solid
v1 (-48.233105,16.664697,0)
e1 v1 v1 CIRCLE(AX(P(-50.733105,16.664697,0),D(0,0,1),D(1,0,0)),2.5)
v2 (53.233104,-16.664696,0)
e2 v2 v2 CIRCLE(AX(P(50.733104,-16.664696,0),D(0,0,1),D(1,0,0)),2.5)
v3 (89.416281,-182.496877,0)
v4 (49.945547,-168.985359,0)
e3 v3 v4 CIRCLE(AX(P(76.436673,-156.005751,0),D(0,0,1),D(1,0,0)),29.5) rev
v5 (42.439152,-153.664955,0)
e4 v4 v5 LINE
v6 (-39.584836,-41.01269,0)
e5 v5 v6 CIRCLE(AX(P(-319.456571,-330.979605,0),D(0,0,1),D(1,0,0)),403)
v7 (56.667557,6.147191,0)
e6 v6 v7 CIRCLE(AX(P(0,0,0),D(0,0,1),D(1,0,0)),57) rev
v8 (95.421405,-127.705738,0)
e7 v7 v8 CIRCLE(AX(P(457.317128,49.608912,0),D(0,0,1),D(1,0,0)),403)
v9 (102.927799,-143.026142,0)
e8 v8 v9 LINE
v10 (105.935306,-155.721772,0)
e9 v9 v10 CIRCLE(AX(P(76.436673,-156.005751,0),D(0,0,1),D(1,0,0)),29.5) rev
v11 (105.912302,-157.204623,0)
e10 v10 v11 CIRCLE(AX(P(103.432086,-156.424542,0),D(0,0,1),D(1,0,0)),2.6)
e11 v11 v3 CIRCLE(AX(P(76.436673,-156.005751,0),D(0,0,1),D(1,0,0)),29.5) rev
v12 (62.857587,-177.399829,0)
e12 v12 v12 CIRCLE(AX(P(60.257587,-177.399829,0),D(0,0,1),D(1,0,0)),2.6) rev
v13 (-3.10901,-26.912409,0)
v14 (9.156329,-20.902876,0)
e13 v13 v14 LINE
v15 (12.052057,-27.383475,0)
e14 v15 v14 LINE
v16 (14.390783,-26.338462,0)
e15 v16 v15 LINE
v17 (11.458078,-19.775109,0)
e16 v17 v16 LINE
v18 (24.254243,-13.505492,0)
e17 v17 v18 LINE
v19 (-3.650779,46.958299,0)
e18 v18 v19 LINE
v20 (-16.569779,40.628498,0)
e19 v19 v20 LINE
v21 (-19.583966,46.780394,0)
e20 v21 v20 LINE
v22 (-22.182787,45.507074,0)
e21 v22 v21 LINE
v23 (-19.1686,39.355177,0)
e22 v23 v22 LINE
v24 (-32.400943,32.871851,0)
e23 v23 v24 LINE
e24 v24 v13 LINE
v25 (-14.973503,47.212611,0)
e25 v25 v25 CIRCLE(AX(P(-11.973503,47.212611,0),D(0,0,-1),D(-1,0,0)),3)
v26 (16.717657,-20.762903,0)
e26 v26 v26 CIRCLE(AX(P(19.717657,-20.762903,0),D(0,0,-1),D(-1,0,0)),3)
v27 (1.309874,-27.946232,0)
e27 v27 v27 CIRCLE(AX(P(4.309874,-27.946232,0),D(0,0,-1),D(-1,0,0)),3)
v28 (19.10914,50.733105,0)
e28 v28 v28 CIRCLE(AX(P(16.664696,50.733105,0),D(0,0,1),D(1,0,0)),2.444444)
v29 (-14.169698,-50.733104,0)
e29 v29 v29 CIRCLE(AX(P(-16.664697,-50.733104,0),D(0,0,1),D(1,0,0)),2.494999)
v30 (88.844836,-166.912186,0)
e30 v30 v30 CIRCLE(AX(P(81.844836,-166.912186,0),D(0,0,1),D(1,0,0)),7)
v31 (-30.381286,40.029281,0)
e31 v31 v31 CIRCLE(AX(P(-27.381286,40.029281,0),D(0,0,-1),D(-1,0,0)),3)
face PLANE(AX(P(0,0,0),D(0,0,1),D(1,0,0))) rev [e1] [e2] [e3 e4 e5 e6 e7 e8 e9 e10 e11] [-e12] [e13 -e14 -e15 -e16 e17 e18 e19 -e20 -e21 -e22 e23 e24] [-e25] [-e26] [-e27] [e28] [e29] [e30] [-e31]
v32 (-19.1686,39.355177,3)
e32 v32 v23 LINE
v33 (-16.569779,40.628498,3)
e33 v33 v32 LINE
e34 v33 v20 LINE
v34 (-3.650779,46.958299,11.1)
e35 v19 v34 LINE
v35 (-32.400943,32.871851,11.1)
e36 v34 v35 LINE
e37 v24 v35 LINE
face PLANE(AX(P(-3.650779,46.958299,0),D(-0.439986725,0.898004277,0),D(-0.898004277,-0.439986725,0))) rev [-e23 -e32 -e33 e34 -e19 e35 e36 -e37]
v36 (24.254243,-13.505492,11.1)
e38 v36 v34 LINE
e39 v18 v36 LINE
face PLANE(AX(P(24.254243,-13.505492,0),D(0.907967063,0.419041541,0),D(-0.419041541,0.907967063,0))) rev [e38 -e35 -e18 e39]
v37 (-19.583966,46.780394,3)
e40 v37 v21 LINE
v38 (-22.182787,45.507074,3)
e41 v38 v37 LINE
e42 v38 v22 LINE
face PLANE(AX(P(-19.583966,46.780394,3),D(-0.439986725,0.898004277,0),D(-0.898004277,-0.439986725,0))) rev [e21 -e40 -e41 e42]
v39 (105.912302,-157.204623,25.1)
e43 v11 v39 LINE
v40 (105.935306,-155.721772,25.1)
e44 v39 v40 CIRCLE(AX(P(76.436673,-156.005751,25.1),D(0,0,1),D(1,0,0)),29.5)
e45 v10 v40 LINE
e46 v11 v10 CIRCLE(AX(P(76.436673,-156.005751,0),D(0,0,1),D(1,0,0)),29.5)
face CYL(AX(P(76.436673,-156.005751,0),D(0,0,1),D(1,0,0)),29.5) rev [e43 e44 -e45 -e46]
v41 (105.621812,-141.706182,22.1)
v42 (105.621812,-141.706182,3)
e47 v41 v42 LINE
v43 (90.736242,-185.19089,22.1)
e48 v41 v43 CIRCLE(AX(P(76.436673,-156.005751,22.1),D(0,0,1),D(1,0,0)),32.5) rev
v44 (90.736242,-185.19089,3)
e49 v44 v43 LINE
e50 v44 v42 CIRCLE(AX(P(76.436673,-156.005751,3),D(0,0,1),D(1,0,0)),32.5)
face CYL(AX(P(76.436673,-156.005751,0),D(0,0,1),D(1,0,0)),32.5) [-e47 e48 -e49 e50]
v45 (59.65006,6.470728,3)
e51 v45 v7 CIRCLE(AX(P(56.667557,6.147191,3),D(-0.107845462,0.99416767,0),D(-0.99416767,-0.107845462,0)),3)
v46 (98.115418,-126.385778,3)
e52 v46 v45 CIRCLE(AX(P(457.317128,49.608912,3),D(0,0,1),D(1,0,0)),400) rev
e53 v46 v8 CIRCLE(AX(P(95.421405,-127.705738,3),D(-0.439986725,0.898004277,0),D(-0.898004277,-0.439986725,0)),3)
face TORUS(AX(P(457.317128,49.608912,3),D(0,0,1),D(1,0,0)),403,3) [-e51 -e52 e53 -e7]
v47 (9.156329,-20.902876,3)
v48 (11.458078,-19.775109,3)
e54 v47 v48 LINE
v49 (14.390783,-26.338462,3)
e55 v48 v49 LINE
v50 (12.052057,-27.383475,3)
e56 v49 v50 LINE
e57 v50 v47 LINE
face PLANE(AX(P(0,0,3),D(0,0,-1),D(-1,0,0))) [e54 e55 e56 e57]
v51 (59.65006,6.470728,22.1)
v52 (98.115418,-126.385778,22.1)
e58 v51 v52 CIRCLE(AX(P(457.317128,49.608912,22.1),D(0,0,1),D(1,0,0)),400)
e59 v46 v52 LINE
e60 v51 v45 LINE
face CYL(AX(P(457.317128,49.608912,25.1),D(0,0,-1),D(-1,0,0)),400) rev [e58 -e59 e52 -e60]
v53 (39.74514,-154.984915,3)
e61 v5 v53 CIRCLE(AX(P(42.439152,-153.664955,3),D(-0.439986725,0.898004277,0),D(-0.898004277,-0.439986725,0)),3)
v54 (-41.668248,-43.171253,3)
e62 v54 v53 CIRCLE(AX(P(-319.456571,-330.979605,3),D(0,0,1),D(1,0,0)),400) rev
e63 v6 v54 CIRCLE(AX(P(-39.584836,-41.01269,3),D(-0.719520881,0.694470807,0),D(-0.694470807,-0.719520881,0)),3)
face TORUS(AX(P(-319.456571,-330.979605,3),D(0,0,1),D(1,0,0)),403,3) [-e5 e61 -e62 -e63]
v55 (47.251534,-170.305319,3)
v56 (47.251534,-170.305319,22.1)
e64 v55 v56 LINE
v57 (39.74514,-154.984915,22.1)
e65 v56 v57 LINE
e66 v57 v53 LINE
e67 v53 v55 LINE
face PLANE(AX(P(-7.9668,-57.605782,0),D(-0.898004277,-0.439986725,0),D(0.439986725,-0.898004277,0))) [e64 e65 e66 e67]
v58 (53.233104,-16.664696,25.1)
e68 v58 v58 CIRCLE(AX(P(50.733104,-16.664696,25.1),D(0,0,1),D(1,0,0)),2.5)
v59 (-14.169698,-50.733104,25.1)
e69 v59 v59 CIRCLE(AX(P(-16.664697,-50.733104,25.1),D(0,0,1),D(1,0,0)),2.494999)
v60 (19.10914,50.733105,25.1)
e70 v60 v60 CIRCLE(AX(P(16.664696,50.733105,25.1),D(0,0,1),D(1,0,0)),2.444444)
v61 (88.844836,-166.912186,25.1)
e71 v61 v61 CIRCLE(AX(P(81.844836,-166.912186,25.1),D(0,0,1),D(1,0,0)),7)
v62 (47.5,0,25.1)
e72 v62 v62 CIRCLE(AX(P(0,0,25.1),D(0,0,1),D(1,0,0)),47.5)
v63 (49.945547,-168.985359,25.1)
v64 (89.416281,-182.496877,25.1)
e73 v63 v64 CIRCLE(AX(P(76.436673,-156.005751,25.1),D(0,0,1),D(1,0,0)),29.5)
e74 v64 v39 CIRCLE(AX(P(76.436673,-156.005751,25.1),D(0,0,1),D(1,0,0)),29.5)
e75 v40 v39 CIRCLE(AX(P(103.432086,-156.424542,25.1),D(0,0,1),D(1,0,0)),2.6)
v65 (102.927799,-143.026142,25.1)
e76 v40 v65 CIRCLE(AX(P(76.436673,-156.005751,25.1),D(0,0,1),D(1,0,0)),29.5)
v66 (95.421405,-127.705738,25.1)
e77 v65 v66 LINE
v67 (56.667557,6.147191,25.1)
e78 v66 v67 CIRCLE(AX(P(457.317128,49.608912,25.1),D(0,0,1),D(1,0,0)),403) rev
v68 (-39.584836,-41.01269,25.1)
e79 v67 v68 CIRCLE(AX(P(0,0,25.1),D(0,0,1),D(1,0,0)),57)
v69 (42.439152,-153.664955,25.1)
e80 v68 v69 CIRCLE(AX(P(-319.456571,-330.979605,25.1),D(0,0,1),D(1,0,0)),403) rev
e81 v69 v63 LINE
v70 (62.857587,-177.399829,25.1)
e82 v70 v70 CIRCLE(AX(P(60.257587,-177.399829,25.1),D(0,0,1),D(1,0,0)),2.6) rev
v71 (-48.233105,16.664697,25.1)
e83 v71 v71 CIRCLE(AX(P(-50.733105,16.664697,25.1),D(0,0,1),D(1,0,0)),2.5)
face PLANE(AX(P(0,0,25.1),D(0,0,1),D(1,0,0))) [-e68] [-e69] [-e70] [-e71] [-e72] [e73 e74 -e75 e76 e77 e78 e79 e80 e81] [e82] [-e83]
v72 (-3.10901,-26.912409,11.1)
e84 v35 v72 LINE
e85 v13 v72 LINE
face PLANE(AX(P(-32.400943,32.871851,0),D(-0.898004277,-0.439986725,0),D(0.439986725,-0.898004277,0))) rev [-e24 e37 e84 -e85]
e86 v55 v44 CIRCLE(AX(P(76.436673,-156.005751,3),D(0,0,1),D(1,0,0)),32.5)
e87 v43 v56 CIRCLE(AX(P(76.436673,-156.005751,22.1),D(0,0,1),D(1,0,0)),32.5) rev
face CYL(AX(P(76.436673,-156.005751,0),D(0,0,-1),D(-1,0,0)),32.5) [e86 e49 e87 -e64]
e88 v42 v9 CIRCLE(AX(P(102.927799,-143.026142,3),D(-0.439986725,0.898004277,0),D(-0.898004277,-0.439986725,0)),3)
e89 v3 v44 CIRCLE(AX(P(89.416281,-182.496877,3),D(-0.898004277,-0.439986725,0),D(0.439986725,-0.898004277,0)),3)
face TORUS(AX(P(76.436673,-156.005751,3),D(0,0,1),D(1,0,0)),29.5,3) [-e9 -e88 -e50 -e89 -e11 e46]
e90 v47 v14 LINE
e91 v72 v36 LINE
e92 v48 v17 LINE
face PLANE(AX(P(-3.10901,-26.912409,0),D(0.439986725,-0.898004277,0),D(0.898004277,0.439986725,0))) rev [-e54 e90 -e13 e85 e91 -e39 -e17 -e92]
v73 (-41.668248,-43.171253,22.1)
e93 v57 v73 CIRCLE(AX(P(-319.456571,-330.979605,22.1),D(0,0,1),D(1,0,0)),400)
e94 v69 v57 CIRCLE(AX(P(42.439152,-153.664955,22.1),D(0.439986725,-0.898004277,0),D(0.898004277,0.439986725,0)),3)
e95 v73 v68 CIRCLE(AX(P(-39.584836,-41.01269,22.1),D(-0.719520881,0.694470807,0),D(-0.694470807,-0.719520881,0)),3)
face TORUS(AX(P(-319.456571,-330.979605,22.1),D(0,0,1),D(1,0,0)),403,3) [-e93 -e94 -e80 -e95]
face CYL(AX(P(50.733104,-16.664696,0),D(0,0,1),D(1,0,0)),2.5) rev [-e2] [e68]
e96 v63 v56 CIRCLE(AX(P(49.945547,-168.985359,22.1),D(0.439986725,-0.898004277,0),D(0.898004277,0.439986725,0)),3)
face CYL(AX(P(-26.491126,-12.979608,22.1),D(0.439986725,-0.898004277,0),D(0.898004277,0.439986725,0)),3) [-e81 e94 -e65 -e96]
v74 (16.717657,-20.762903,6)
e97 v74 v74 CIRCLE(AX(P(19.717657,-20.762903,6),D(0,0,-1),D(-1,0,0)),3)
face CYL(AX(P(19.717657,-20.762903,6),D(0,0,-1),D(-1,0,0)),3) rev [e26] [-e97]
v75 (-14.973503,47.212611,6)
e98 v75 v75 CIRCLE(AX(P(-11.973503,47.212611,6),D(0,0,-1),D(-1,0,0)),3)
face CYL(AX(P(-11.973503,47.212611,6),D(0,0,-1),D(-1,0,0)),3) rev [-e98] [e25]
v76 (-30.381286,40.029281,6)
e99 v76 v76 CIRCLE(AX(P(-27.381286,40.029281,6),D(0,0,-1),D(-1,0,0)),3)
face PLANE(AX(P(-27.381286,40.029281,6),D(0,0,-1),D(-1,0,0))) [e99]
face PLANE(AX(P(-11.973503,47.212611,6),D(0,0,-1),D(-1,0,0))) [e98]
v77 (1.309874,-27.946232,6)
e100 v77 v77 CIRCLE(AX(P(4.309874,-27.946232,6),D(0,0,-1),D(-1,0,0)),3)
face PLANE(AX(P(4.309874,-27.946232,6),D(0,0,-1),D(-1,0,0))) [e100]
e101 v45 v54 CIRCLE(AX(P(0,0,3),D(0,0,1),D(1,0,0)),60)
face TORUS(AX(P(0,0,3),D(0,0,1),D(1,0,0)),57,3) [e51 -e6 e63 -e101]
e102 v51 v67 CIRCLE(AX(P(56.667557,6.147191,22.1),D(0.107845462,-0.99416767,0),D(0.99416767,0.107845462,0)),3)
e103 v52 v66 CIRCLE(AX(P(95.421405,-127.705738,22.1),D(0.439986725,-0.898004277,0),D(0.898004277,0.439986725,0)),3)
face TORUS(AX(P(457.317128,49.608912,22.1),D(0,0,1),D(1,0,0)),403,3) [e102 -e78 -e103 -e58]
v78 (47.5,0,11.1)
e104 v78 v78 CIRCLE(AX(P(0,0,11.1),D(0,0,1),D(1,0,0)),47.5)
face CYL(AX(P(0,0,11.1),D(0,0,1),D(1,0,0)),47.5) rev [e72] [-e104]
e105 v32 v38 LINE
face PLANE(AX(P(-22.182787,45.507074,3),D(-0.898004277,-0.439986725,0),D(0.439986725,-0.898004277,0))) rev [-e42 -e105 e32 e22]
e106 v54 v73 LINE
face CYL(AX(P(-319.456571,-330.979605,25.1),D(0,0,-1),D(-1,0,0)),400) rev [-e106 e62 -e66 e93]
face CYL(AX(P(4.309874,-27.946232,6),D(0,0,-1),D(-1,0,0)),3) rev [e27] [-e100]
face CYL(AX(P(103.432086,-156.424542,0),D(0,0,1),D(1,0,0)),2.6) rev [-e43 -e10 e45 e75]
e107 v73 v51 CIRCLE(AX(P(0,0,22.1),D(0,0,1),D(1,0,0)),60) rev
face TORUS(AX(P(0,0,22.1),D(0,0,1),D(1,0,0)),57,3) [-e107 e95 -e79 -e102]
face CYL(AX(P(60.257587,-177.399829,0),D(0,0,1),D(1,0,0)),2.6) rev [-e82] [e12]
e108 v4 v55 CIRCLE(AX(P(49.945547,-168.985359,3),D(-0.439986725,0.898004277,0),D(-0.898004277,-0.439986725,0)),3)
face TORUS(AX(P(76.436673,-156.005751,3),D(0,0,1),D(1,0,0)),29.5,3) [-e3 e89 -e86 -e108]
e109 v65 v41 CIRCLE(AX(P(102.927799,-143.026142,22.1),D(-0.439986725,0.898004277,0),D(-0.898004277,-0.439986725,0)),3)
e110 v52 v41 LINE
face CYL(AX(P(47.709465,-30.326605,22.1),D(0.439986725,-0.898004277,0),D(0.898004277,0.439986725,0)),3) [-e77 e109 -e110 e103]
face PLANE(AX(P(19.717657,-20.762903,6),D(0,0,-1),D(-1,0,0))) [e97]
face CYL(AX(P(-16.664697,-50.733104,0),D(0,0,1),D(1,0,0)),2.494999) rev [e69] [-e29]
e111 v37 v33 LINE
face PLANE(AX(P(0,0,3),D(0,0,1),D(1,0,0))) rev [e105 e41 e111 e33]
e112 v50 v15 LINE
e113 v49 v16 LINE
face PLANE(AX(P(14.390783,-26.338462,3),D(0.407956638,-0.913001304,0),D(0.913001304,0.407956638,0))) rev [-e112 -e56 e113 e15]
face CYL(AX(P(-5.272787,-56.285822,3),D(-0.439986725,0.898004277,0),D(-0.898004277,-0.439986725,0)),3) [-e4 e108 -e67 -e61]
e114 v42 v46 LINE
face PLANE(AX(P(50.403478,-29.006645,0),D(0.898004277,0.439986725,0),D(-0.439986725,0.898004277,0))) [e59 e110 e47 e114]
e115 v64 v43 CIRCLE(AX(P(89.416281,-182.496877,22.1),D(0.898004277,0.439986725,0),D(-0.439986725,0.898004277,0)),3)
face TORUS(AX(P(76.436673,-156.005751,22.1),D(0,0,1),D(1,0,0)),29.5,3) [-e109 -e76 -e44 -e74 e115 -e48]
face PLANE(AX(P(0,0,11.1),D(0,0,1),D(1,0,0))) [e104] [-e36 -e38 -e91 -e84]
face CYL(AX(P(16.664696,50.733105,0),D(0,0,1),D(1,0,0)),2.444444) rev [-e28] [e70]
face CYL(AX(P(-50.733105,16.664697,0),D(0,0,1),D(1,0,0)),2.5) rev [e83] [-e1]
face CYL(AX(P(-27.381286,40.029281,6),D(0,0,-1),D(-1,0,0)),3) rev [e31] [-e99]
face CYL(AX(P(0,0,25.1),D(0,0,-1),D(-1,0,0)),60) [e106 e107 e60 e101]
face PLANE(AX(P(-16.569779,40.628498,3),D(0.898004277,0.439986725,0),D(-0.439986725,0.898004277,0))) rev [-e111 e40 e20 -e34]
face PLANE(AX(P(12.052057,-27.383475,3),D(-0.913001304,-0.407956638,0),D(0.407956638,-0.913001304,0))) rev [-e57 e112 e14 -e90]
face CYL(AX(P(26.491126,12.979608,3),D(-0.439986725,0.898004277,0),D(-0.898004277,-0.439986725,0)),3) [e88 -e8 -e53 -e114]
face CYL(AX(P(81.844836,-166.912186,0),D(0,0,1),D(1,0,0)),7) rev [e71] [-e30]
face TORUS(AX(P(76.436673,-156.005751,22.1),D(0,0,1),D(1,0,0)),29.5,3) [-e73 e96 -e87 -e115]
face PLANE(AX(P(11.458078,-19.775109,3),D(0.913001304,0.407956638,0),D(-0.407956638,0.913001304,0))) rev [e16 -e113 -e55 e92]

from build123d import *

# Parameters (mm, degrees)
SKETCH1_R                = 60
BOSS_EXTRUDE1_DEPTH      = 25.1
SKETCH3_R                = 47.5
CUT_EXTRUDE2_DEPTH       = 14
CUT_EXTRUDE5_DEPTH       = 89.487343728
CUT_EXTRUDE5_DEPTH_BACK  = 89.487343728
SKETCH2_R                = 2.494998654
SKETCH2_R_2              = 2.5
SKETCH2_R_3              = 2.444443829
SKETCH6_R                = 3
CUT_EXTRUDE6_DEPTH       = 6
CUT_EXTRUDE7_DEPTH       = 87
CUT_EXTRUDE7_DEPTH_BACK  = 87
BOSS_EXTRUDE2_DEPTH      = 130
BOSS_EXTRUDE2_DEPTH_BACK = 28
SKETCH8_W                = 65
SKETCH8_H                = 25.1
CUT_EXTRUDE9_DEPTH       = 3
FILLET6_R                = 32.5
FILLET7_R                = 400
FILLET8_R                = 3
CUT_EXTRUDE10_DEPTH      = 220.161234767
CUT_EXTRUDE10_DEPTH_BACK = 220.161234767
SKETCH14_R               = 2.6
CUT_EXTRUDE11_DEPTH      = 220.161234767
CUT_EXTRUDE11_DEPTH_BACK = 220.161234767
SKETCH15_R               = 7


with BuildPart() as part:
    # Sketch1 → Boss-Extrude1 (new body)
    with BuildSketch(Plane.XY):
        Circle(SKETCH1_R)
    extrude(amount=BOSS_EXTRUDE1_DEPTH)

    # Sketch3 → Cut-Extrude2 (cut)
    with BuildSketch(Plane.XY.offset(25.1)):
        Circle(SKETCH3_R)
    extrude(amount=-CUT_EXTRUDE2_DEPTH, mode=Mode.SUBTRACT)

    # Sketch2 → Cut-Extrude5 (cut, two sides: drawn at the far end of the back side and taken through both)
    with BuildSketch(Plane.XY.offset(25.1).offset(-CUT_EXTRUDE5_DEPTH_BACK)):
        with Locations((-16.664697145, -50.733104448)):
            Circle(SKETCH2_R)
        with Locations((-50.733105114, 16.664696544)):
            Circle(SKETCH2_R_2)
        with Locations((16.664695878, 50.733104512)):
            Circle(SKETCH2_R_3)
        with Locations((50.733103846, -16.66469648)):
            Circle(SKETCH2_R_2)
    extrude(amount=CUT_EXTRUDE5_DEPTH + CUT_EXTRUDE5_DEPTH_BACK, mode=Mode.SUBTRACT)

    # Sketch6 → Cut-Extrude6 (cut)
    with BuildSketch(Plane(origin=(0, 0, 0), x_dir=(-1, 0, 0), z_dir=(0, 0, -1))):
        with Locations((11.973502988, 47.212610548)):
            Circle(SKETCH6_R)
        with Locations((27.381285989, 40.029281029)):
            Circle(SKETCH6_R)
        with Locations((-19.717656658, -20.762902692)):
            Circle(SKETCH6_R)
        with Locations((-4.309873657, -27.946232212)):
            Circle(SKETCH6_R)
    extrude(amount=-CUT_EXTRUDE6_DEPTH, mode=Mode.SUBTRACT)

    # Sketch7 → Cut-Extrude7 (cut, two sides: drawn at the far end of the back side and taken through both)
    with BuildSketch(Plane.XY.offset(11.1).offset(-CUT_EXTRUDE7_DEPTH_BACK)):
        Polygon((-32.400942803, 32.871850778), (-3.10901045, -26.912408633), (24.254242539, -13.505492441), (-3.650778768, 46.958298756), align=None)
    extrude(amount=CUT_EXTRUDE7_DEPTH + CUT_EXTRUDE7_DEPTH_BACK, mode=Mode.SUBTRACT)

    # Sketch8 → Boss-Extrude2 (add, two sides: drawn at the far end of the back side and taken through both)
    with BuildSketch(Plane(origin=(33.53796733, -68.45033352, 0), x_dir=(-0.8980042769467113, -0.4399867254650012, 0), z_dir=(0.4399867254650012, -0.8980042769467113, 0)).offset(-BOSS_EXTRUDE2_DEPTH_BACK)):
        with Locations((0, -12.55)):
            Rectangle(SKETCH8_W, SKETCH8_H)
    extrude(amount=BOSS_EXTRUDE2_DEPTH + BOSS_EXTRUDE2_DEPTH_BACK)

    # Sketch12 → Cut-Extrude9 (cut)
    with BuildSketch(Plane(origin=(0, 0, 0), x_dir=(-1, 0, 0), z_dir=(0, 0, -1))):
        Polygon((16.569778792, 40.628497592), (19.583965842, 46.780394242), (22.182787305, 45.507074086), (19.168600256, 39.355177436), align=None)
        Polygon((-11.458078278, -19.775108918), (-14.390783054, -26.33846158), (-12.052056845, -27.383475291), (-9.156328603, -20.902875599), align=None)
    extrude(amount=-CUT_EXTRUDE9_DEPTH, mode=Mode.SUBTRACT)

    # Fillet6
    fillet6_edges = [part.edges().sort_by_distance(p)[0] for p in [
        (61.55110264, -199.490458101, 12.55),
        (119.921380641, -170.891320946, 12.55),
    ]]
    fillet(fillet6_edges, radius=FILLET6_R - 0.0001)  # a hair under: the kernel refuses the full size

    # Fillet7
    fillet7_edges = [part.edges().sort_by_distance(p)[0] for p in [
        (-6.994143408, -59.590955337, 12.55),
        (51.376134594, -30.991818182, 12.55),
    ]]
    fillet(fillet7_edges, radius=FILLET7_R)

    # Fillet8
    fillet8_edges = [part.edges().sort_by_distance(p)[0] for p in [
        (107.185043858, -166.531451726, 0),
        (65.91097186, -186.754121318, 0),
        (107.185043858, -166.531451726, 25.1),
        (65.91097186, -186.754121318, 25.1),
        (-26.399203528, 53.880256617, 0),
        (-26.399203528, 53.880256617, 25.1),
        (43.498358781, -162.645161964, 0),
        (43.498358781, -162.645161964, 25.1),
        (101.868636782, -134.046024809, 25.1),
        (101.868636782, -134.046024809, 0),
        (3.908005474, -95.532476324, 25.1),
        (3.908005474, -95.532476324, 0),
        (73.096748984, -61.632717183, 0),
        (73.096748984, -61.632717183, 25.1),
    ]]
    fillet(fillet8_edges, radius=FILLET8_R)

    # Sketch14 → Cut-Extrude10 (cut, two sides: drawn at the far end of the back side and taken through both)
    with BuildSketch(Plane.XY.offset(25.1).offset(-CUT_EXTRUDE10_DEPTH_BACK)):
        with Locations((60.257586661, -177.399828934)):
            Circle(SKETCH14_R)
        with BuildLine():
            ThreePointArc((105.912302046, -157.204623351), (105.933123865, -156.463342159), (105.935306185, -155.721771804))
            ThreePointArc((105.935306185, -155.721771804), (100.832398382, -156.384212323), (105.912302046, -157.204623351))
        make_face()
    extrude(amount=CUT_EXTRUDE10_DEPTH + CUT_EXTRUDE10_DEPTH_BACK, mode=Mode.SUBTRACT)

    # Sketch15 → Cut-Extrude11 (cut, two sides: drawn at the far end of the back side and taken through both)
    with BuildSketch(Plane.XY.offset(25.1).offset(-CUT_EXTRUDE11_DEPTH_BACK)):
        with Locations((81.844836116, -166.912185684)):
            Circle(SKETCH15_R)
    extrude(amount=CUT_EXTRUDE11_DEPTH + CUT_EXTRUDE11_DEPTH_BACK, mode=Mode.SUBTRACT)


solid = part.part
